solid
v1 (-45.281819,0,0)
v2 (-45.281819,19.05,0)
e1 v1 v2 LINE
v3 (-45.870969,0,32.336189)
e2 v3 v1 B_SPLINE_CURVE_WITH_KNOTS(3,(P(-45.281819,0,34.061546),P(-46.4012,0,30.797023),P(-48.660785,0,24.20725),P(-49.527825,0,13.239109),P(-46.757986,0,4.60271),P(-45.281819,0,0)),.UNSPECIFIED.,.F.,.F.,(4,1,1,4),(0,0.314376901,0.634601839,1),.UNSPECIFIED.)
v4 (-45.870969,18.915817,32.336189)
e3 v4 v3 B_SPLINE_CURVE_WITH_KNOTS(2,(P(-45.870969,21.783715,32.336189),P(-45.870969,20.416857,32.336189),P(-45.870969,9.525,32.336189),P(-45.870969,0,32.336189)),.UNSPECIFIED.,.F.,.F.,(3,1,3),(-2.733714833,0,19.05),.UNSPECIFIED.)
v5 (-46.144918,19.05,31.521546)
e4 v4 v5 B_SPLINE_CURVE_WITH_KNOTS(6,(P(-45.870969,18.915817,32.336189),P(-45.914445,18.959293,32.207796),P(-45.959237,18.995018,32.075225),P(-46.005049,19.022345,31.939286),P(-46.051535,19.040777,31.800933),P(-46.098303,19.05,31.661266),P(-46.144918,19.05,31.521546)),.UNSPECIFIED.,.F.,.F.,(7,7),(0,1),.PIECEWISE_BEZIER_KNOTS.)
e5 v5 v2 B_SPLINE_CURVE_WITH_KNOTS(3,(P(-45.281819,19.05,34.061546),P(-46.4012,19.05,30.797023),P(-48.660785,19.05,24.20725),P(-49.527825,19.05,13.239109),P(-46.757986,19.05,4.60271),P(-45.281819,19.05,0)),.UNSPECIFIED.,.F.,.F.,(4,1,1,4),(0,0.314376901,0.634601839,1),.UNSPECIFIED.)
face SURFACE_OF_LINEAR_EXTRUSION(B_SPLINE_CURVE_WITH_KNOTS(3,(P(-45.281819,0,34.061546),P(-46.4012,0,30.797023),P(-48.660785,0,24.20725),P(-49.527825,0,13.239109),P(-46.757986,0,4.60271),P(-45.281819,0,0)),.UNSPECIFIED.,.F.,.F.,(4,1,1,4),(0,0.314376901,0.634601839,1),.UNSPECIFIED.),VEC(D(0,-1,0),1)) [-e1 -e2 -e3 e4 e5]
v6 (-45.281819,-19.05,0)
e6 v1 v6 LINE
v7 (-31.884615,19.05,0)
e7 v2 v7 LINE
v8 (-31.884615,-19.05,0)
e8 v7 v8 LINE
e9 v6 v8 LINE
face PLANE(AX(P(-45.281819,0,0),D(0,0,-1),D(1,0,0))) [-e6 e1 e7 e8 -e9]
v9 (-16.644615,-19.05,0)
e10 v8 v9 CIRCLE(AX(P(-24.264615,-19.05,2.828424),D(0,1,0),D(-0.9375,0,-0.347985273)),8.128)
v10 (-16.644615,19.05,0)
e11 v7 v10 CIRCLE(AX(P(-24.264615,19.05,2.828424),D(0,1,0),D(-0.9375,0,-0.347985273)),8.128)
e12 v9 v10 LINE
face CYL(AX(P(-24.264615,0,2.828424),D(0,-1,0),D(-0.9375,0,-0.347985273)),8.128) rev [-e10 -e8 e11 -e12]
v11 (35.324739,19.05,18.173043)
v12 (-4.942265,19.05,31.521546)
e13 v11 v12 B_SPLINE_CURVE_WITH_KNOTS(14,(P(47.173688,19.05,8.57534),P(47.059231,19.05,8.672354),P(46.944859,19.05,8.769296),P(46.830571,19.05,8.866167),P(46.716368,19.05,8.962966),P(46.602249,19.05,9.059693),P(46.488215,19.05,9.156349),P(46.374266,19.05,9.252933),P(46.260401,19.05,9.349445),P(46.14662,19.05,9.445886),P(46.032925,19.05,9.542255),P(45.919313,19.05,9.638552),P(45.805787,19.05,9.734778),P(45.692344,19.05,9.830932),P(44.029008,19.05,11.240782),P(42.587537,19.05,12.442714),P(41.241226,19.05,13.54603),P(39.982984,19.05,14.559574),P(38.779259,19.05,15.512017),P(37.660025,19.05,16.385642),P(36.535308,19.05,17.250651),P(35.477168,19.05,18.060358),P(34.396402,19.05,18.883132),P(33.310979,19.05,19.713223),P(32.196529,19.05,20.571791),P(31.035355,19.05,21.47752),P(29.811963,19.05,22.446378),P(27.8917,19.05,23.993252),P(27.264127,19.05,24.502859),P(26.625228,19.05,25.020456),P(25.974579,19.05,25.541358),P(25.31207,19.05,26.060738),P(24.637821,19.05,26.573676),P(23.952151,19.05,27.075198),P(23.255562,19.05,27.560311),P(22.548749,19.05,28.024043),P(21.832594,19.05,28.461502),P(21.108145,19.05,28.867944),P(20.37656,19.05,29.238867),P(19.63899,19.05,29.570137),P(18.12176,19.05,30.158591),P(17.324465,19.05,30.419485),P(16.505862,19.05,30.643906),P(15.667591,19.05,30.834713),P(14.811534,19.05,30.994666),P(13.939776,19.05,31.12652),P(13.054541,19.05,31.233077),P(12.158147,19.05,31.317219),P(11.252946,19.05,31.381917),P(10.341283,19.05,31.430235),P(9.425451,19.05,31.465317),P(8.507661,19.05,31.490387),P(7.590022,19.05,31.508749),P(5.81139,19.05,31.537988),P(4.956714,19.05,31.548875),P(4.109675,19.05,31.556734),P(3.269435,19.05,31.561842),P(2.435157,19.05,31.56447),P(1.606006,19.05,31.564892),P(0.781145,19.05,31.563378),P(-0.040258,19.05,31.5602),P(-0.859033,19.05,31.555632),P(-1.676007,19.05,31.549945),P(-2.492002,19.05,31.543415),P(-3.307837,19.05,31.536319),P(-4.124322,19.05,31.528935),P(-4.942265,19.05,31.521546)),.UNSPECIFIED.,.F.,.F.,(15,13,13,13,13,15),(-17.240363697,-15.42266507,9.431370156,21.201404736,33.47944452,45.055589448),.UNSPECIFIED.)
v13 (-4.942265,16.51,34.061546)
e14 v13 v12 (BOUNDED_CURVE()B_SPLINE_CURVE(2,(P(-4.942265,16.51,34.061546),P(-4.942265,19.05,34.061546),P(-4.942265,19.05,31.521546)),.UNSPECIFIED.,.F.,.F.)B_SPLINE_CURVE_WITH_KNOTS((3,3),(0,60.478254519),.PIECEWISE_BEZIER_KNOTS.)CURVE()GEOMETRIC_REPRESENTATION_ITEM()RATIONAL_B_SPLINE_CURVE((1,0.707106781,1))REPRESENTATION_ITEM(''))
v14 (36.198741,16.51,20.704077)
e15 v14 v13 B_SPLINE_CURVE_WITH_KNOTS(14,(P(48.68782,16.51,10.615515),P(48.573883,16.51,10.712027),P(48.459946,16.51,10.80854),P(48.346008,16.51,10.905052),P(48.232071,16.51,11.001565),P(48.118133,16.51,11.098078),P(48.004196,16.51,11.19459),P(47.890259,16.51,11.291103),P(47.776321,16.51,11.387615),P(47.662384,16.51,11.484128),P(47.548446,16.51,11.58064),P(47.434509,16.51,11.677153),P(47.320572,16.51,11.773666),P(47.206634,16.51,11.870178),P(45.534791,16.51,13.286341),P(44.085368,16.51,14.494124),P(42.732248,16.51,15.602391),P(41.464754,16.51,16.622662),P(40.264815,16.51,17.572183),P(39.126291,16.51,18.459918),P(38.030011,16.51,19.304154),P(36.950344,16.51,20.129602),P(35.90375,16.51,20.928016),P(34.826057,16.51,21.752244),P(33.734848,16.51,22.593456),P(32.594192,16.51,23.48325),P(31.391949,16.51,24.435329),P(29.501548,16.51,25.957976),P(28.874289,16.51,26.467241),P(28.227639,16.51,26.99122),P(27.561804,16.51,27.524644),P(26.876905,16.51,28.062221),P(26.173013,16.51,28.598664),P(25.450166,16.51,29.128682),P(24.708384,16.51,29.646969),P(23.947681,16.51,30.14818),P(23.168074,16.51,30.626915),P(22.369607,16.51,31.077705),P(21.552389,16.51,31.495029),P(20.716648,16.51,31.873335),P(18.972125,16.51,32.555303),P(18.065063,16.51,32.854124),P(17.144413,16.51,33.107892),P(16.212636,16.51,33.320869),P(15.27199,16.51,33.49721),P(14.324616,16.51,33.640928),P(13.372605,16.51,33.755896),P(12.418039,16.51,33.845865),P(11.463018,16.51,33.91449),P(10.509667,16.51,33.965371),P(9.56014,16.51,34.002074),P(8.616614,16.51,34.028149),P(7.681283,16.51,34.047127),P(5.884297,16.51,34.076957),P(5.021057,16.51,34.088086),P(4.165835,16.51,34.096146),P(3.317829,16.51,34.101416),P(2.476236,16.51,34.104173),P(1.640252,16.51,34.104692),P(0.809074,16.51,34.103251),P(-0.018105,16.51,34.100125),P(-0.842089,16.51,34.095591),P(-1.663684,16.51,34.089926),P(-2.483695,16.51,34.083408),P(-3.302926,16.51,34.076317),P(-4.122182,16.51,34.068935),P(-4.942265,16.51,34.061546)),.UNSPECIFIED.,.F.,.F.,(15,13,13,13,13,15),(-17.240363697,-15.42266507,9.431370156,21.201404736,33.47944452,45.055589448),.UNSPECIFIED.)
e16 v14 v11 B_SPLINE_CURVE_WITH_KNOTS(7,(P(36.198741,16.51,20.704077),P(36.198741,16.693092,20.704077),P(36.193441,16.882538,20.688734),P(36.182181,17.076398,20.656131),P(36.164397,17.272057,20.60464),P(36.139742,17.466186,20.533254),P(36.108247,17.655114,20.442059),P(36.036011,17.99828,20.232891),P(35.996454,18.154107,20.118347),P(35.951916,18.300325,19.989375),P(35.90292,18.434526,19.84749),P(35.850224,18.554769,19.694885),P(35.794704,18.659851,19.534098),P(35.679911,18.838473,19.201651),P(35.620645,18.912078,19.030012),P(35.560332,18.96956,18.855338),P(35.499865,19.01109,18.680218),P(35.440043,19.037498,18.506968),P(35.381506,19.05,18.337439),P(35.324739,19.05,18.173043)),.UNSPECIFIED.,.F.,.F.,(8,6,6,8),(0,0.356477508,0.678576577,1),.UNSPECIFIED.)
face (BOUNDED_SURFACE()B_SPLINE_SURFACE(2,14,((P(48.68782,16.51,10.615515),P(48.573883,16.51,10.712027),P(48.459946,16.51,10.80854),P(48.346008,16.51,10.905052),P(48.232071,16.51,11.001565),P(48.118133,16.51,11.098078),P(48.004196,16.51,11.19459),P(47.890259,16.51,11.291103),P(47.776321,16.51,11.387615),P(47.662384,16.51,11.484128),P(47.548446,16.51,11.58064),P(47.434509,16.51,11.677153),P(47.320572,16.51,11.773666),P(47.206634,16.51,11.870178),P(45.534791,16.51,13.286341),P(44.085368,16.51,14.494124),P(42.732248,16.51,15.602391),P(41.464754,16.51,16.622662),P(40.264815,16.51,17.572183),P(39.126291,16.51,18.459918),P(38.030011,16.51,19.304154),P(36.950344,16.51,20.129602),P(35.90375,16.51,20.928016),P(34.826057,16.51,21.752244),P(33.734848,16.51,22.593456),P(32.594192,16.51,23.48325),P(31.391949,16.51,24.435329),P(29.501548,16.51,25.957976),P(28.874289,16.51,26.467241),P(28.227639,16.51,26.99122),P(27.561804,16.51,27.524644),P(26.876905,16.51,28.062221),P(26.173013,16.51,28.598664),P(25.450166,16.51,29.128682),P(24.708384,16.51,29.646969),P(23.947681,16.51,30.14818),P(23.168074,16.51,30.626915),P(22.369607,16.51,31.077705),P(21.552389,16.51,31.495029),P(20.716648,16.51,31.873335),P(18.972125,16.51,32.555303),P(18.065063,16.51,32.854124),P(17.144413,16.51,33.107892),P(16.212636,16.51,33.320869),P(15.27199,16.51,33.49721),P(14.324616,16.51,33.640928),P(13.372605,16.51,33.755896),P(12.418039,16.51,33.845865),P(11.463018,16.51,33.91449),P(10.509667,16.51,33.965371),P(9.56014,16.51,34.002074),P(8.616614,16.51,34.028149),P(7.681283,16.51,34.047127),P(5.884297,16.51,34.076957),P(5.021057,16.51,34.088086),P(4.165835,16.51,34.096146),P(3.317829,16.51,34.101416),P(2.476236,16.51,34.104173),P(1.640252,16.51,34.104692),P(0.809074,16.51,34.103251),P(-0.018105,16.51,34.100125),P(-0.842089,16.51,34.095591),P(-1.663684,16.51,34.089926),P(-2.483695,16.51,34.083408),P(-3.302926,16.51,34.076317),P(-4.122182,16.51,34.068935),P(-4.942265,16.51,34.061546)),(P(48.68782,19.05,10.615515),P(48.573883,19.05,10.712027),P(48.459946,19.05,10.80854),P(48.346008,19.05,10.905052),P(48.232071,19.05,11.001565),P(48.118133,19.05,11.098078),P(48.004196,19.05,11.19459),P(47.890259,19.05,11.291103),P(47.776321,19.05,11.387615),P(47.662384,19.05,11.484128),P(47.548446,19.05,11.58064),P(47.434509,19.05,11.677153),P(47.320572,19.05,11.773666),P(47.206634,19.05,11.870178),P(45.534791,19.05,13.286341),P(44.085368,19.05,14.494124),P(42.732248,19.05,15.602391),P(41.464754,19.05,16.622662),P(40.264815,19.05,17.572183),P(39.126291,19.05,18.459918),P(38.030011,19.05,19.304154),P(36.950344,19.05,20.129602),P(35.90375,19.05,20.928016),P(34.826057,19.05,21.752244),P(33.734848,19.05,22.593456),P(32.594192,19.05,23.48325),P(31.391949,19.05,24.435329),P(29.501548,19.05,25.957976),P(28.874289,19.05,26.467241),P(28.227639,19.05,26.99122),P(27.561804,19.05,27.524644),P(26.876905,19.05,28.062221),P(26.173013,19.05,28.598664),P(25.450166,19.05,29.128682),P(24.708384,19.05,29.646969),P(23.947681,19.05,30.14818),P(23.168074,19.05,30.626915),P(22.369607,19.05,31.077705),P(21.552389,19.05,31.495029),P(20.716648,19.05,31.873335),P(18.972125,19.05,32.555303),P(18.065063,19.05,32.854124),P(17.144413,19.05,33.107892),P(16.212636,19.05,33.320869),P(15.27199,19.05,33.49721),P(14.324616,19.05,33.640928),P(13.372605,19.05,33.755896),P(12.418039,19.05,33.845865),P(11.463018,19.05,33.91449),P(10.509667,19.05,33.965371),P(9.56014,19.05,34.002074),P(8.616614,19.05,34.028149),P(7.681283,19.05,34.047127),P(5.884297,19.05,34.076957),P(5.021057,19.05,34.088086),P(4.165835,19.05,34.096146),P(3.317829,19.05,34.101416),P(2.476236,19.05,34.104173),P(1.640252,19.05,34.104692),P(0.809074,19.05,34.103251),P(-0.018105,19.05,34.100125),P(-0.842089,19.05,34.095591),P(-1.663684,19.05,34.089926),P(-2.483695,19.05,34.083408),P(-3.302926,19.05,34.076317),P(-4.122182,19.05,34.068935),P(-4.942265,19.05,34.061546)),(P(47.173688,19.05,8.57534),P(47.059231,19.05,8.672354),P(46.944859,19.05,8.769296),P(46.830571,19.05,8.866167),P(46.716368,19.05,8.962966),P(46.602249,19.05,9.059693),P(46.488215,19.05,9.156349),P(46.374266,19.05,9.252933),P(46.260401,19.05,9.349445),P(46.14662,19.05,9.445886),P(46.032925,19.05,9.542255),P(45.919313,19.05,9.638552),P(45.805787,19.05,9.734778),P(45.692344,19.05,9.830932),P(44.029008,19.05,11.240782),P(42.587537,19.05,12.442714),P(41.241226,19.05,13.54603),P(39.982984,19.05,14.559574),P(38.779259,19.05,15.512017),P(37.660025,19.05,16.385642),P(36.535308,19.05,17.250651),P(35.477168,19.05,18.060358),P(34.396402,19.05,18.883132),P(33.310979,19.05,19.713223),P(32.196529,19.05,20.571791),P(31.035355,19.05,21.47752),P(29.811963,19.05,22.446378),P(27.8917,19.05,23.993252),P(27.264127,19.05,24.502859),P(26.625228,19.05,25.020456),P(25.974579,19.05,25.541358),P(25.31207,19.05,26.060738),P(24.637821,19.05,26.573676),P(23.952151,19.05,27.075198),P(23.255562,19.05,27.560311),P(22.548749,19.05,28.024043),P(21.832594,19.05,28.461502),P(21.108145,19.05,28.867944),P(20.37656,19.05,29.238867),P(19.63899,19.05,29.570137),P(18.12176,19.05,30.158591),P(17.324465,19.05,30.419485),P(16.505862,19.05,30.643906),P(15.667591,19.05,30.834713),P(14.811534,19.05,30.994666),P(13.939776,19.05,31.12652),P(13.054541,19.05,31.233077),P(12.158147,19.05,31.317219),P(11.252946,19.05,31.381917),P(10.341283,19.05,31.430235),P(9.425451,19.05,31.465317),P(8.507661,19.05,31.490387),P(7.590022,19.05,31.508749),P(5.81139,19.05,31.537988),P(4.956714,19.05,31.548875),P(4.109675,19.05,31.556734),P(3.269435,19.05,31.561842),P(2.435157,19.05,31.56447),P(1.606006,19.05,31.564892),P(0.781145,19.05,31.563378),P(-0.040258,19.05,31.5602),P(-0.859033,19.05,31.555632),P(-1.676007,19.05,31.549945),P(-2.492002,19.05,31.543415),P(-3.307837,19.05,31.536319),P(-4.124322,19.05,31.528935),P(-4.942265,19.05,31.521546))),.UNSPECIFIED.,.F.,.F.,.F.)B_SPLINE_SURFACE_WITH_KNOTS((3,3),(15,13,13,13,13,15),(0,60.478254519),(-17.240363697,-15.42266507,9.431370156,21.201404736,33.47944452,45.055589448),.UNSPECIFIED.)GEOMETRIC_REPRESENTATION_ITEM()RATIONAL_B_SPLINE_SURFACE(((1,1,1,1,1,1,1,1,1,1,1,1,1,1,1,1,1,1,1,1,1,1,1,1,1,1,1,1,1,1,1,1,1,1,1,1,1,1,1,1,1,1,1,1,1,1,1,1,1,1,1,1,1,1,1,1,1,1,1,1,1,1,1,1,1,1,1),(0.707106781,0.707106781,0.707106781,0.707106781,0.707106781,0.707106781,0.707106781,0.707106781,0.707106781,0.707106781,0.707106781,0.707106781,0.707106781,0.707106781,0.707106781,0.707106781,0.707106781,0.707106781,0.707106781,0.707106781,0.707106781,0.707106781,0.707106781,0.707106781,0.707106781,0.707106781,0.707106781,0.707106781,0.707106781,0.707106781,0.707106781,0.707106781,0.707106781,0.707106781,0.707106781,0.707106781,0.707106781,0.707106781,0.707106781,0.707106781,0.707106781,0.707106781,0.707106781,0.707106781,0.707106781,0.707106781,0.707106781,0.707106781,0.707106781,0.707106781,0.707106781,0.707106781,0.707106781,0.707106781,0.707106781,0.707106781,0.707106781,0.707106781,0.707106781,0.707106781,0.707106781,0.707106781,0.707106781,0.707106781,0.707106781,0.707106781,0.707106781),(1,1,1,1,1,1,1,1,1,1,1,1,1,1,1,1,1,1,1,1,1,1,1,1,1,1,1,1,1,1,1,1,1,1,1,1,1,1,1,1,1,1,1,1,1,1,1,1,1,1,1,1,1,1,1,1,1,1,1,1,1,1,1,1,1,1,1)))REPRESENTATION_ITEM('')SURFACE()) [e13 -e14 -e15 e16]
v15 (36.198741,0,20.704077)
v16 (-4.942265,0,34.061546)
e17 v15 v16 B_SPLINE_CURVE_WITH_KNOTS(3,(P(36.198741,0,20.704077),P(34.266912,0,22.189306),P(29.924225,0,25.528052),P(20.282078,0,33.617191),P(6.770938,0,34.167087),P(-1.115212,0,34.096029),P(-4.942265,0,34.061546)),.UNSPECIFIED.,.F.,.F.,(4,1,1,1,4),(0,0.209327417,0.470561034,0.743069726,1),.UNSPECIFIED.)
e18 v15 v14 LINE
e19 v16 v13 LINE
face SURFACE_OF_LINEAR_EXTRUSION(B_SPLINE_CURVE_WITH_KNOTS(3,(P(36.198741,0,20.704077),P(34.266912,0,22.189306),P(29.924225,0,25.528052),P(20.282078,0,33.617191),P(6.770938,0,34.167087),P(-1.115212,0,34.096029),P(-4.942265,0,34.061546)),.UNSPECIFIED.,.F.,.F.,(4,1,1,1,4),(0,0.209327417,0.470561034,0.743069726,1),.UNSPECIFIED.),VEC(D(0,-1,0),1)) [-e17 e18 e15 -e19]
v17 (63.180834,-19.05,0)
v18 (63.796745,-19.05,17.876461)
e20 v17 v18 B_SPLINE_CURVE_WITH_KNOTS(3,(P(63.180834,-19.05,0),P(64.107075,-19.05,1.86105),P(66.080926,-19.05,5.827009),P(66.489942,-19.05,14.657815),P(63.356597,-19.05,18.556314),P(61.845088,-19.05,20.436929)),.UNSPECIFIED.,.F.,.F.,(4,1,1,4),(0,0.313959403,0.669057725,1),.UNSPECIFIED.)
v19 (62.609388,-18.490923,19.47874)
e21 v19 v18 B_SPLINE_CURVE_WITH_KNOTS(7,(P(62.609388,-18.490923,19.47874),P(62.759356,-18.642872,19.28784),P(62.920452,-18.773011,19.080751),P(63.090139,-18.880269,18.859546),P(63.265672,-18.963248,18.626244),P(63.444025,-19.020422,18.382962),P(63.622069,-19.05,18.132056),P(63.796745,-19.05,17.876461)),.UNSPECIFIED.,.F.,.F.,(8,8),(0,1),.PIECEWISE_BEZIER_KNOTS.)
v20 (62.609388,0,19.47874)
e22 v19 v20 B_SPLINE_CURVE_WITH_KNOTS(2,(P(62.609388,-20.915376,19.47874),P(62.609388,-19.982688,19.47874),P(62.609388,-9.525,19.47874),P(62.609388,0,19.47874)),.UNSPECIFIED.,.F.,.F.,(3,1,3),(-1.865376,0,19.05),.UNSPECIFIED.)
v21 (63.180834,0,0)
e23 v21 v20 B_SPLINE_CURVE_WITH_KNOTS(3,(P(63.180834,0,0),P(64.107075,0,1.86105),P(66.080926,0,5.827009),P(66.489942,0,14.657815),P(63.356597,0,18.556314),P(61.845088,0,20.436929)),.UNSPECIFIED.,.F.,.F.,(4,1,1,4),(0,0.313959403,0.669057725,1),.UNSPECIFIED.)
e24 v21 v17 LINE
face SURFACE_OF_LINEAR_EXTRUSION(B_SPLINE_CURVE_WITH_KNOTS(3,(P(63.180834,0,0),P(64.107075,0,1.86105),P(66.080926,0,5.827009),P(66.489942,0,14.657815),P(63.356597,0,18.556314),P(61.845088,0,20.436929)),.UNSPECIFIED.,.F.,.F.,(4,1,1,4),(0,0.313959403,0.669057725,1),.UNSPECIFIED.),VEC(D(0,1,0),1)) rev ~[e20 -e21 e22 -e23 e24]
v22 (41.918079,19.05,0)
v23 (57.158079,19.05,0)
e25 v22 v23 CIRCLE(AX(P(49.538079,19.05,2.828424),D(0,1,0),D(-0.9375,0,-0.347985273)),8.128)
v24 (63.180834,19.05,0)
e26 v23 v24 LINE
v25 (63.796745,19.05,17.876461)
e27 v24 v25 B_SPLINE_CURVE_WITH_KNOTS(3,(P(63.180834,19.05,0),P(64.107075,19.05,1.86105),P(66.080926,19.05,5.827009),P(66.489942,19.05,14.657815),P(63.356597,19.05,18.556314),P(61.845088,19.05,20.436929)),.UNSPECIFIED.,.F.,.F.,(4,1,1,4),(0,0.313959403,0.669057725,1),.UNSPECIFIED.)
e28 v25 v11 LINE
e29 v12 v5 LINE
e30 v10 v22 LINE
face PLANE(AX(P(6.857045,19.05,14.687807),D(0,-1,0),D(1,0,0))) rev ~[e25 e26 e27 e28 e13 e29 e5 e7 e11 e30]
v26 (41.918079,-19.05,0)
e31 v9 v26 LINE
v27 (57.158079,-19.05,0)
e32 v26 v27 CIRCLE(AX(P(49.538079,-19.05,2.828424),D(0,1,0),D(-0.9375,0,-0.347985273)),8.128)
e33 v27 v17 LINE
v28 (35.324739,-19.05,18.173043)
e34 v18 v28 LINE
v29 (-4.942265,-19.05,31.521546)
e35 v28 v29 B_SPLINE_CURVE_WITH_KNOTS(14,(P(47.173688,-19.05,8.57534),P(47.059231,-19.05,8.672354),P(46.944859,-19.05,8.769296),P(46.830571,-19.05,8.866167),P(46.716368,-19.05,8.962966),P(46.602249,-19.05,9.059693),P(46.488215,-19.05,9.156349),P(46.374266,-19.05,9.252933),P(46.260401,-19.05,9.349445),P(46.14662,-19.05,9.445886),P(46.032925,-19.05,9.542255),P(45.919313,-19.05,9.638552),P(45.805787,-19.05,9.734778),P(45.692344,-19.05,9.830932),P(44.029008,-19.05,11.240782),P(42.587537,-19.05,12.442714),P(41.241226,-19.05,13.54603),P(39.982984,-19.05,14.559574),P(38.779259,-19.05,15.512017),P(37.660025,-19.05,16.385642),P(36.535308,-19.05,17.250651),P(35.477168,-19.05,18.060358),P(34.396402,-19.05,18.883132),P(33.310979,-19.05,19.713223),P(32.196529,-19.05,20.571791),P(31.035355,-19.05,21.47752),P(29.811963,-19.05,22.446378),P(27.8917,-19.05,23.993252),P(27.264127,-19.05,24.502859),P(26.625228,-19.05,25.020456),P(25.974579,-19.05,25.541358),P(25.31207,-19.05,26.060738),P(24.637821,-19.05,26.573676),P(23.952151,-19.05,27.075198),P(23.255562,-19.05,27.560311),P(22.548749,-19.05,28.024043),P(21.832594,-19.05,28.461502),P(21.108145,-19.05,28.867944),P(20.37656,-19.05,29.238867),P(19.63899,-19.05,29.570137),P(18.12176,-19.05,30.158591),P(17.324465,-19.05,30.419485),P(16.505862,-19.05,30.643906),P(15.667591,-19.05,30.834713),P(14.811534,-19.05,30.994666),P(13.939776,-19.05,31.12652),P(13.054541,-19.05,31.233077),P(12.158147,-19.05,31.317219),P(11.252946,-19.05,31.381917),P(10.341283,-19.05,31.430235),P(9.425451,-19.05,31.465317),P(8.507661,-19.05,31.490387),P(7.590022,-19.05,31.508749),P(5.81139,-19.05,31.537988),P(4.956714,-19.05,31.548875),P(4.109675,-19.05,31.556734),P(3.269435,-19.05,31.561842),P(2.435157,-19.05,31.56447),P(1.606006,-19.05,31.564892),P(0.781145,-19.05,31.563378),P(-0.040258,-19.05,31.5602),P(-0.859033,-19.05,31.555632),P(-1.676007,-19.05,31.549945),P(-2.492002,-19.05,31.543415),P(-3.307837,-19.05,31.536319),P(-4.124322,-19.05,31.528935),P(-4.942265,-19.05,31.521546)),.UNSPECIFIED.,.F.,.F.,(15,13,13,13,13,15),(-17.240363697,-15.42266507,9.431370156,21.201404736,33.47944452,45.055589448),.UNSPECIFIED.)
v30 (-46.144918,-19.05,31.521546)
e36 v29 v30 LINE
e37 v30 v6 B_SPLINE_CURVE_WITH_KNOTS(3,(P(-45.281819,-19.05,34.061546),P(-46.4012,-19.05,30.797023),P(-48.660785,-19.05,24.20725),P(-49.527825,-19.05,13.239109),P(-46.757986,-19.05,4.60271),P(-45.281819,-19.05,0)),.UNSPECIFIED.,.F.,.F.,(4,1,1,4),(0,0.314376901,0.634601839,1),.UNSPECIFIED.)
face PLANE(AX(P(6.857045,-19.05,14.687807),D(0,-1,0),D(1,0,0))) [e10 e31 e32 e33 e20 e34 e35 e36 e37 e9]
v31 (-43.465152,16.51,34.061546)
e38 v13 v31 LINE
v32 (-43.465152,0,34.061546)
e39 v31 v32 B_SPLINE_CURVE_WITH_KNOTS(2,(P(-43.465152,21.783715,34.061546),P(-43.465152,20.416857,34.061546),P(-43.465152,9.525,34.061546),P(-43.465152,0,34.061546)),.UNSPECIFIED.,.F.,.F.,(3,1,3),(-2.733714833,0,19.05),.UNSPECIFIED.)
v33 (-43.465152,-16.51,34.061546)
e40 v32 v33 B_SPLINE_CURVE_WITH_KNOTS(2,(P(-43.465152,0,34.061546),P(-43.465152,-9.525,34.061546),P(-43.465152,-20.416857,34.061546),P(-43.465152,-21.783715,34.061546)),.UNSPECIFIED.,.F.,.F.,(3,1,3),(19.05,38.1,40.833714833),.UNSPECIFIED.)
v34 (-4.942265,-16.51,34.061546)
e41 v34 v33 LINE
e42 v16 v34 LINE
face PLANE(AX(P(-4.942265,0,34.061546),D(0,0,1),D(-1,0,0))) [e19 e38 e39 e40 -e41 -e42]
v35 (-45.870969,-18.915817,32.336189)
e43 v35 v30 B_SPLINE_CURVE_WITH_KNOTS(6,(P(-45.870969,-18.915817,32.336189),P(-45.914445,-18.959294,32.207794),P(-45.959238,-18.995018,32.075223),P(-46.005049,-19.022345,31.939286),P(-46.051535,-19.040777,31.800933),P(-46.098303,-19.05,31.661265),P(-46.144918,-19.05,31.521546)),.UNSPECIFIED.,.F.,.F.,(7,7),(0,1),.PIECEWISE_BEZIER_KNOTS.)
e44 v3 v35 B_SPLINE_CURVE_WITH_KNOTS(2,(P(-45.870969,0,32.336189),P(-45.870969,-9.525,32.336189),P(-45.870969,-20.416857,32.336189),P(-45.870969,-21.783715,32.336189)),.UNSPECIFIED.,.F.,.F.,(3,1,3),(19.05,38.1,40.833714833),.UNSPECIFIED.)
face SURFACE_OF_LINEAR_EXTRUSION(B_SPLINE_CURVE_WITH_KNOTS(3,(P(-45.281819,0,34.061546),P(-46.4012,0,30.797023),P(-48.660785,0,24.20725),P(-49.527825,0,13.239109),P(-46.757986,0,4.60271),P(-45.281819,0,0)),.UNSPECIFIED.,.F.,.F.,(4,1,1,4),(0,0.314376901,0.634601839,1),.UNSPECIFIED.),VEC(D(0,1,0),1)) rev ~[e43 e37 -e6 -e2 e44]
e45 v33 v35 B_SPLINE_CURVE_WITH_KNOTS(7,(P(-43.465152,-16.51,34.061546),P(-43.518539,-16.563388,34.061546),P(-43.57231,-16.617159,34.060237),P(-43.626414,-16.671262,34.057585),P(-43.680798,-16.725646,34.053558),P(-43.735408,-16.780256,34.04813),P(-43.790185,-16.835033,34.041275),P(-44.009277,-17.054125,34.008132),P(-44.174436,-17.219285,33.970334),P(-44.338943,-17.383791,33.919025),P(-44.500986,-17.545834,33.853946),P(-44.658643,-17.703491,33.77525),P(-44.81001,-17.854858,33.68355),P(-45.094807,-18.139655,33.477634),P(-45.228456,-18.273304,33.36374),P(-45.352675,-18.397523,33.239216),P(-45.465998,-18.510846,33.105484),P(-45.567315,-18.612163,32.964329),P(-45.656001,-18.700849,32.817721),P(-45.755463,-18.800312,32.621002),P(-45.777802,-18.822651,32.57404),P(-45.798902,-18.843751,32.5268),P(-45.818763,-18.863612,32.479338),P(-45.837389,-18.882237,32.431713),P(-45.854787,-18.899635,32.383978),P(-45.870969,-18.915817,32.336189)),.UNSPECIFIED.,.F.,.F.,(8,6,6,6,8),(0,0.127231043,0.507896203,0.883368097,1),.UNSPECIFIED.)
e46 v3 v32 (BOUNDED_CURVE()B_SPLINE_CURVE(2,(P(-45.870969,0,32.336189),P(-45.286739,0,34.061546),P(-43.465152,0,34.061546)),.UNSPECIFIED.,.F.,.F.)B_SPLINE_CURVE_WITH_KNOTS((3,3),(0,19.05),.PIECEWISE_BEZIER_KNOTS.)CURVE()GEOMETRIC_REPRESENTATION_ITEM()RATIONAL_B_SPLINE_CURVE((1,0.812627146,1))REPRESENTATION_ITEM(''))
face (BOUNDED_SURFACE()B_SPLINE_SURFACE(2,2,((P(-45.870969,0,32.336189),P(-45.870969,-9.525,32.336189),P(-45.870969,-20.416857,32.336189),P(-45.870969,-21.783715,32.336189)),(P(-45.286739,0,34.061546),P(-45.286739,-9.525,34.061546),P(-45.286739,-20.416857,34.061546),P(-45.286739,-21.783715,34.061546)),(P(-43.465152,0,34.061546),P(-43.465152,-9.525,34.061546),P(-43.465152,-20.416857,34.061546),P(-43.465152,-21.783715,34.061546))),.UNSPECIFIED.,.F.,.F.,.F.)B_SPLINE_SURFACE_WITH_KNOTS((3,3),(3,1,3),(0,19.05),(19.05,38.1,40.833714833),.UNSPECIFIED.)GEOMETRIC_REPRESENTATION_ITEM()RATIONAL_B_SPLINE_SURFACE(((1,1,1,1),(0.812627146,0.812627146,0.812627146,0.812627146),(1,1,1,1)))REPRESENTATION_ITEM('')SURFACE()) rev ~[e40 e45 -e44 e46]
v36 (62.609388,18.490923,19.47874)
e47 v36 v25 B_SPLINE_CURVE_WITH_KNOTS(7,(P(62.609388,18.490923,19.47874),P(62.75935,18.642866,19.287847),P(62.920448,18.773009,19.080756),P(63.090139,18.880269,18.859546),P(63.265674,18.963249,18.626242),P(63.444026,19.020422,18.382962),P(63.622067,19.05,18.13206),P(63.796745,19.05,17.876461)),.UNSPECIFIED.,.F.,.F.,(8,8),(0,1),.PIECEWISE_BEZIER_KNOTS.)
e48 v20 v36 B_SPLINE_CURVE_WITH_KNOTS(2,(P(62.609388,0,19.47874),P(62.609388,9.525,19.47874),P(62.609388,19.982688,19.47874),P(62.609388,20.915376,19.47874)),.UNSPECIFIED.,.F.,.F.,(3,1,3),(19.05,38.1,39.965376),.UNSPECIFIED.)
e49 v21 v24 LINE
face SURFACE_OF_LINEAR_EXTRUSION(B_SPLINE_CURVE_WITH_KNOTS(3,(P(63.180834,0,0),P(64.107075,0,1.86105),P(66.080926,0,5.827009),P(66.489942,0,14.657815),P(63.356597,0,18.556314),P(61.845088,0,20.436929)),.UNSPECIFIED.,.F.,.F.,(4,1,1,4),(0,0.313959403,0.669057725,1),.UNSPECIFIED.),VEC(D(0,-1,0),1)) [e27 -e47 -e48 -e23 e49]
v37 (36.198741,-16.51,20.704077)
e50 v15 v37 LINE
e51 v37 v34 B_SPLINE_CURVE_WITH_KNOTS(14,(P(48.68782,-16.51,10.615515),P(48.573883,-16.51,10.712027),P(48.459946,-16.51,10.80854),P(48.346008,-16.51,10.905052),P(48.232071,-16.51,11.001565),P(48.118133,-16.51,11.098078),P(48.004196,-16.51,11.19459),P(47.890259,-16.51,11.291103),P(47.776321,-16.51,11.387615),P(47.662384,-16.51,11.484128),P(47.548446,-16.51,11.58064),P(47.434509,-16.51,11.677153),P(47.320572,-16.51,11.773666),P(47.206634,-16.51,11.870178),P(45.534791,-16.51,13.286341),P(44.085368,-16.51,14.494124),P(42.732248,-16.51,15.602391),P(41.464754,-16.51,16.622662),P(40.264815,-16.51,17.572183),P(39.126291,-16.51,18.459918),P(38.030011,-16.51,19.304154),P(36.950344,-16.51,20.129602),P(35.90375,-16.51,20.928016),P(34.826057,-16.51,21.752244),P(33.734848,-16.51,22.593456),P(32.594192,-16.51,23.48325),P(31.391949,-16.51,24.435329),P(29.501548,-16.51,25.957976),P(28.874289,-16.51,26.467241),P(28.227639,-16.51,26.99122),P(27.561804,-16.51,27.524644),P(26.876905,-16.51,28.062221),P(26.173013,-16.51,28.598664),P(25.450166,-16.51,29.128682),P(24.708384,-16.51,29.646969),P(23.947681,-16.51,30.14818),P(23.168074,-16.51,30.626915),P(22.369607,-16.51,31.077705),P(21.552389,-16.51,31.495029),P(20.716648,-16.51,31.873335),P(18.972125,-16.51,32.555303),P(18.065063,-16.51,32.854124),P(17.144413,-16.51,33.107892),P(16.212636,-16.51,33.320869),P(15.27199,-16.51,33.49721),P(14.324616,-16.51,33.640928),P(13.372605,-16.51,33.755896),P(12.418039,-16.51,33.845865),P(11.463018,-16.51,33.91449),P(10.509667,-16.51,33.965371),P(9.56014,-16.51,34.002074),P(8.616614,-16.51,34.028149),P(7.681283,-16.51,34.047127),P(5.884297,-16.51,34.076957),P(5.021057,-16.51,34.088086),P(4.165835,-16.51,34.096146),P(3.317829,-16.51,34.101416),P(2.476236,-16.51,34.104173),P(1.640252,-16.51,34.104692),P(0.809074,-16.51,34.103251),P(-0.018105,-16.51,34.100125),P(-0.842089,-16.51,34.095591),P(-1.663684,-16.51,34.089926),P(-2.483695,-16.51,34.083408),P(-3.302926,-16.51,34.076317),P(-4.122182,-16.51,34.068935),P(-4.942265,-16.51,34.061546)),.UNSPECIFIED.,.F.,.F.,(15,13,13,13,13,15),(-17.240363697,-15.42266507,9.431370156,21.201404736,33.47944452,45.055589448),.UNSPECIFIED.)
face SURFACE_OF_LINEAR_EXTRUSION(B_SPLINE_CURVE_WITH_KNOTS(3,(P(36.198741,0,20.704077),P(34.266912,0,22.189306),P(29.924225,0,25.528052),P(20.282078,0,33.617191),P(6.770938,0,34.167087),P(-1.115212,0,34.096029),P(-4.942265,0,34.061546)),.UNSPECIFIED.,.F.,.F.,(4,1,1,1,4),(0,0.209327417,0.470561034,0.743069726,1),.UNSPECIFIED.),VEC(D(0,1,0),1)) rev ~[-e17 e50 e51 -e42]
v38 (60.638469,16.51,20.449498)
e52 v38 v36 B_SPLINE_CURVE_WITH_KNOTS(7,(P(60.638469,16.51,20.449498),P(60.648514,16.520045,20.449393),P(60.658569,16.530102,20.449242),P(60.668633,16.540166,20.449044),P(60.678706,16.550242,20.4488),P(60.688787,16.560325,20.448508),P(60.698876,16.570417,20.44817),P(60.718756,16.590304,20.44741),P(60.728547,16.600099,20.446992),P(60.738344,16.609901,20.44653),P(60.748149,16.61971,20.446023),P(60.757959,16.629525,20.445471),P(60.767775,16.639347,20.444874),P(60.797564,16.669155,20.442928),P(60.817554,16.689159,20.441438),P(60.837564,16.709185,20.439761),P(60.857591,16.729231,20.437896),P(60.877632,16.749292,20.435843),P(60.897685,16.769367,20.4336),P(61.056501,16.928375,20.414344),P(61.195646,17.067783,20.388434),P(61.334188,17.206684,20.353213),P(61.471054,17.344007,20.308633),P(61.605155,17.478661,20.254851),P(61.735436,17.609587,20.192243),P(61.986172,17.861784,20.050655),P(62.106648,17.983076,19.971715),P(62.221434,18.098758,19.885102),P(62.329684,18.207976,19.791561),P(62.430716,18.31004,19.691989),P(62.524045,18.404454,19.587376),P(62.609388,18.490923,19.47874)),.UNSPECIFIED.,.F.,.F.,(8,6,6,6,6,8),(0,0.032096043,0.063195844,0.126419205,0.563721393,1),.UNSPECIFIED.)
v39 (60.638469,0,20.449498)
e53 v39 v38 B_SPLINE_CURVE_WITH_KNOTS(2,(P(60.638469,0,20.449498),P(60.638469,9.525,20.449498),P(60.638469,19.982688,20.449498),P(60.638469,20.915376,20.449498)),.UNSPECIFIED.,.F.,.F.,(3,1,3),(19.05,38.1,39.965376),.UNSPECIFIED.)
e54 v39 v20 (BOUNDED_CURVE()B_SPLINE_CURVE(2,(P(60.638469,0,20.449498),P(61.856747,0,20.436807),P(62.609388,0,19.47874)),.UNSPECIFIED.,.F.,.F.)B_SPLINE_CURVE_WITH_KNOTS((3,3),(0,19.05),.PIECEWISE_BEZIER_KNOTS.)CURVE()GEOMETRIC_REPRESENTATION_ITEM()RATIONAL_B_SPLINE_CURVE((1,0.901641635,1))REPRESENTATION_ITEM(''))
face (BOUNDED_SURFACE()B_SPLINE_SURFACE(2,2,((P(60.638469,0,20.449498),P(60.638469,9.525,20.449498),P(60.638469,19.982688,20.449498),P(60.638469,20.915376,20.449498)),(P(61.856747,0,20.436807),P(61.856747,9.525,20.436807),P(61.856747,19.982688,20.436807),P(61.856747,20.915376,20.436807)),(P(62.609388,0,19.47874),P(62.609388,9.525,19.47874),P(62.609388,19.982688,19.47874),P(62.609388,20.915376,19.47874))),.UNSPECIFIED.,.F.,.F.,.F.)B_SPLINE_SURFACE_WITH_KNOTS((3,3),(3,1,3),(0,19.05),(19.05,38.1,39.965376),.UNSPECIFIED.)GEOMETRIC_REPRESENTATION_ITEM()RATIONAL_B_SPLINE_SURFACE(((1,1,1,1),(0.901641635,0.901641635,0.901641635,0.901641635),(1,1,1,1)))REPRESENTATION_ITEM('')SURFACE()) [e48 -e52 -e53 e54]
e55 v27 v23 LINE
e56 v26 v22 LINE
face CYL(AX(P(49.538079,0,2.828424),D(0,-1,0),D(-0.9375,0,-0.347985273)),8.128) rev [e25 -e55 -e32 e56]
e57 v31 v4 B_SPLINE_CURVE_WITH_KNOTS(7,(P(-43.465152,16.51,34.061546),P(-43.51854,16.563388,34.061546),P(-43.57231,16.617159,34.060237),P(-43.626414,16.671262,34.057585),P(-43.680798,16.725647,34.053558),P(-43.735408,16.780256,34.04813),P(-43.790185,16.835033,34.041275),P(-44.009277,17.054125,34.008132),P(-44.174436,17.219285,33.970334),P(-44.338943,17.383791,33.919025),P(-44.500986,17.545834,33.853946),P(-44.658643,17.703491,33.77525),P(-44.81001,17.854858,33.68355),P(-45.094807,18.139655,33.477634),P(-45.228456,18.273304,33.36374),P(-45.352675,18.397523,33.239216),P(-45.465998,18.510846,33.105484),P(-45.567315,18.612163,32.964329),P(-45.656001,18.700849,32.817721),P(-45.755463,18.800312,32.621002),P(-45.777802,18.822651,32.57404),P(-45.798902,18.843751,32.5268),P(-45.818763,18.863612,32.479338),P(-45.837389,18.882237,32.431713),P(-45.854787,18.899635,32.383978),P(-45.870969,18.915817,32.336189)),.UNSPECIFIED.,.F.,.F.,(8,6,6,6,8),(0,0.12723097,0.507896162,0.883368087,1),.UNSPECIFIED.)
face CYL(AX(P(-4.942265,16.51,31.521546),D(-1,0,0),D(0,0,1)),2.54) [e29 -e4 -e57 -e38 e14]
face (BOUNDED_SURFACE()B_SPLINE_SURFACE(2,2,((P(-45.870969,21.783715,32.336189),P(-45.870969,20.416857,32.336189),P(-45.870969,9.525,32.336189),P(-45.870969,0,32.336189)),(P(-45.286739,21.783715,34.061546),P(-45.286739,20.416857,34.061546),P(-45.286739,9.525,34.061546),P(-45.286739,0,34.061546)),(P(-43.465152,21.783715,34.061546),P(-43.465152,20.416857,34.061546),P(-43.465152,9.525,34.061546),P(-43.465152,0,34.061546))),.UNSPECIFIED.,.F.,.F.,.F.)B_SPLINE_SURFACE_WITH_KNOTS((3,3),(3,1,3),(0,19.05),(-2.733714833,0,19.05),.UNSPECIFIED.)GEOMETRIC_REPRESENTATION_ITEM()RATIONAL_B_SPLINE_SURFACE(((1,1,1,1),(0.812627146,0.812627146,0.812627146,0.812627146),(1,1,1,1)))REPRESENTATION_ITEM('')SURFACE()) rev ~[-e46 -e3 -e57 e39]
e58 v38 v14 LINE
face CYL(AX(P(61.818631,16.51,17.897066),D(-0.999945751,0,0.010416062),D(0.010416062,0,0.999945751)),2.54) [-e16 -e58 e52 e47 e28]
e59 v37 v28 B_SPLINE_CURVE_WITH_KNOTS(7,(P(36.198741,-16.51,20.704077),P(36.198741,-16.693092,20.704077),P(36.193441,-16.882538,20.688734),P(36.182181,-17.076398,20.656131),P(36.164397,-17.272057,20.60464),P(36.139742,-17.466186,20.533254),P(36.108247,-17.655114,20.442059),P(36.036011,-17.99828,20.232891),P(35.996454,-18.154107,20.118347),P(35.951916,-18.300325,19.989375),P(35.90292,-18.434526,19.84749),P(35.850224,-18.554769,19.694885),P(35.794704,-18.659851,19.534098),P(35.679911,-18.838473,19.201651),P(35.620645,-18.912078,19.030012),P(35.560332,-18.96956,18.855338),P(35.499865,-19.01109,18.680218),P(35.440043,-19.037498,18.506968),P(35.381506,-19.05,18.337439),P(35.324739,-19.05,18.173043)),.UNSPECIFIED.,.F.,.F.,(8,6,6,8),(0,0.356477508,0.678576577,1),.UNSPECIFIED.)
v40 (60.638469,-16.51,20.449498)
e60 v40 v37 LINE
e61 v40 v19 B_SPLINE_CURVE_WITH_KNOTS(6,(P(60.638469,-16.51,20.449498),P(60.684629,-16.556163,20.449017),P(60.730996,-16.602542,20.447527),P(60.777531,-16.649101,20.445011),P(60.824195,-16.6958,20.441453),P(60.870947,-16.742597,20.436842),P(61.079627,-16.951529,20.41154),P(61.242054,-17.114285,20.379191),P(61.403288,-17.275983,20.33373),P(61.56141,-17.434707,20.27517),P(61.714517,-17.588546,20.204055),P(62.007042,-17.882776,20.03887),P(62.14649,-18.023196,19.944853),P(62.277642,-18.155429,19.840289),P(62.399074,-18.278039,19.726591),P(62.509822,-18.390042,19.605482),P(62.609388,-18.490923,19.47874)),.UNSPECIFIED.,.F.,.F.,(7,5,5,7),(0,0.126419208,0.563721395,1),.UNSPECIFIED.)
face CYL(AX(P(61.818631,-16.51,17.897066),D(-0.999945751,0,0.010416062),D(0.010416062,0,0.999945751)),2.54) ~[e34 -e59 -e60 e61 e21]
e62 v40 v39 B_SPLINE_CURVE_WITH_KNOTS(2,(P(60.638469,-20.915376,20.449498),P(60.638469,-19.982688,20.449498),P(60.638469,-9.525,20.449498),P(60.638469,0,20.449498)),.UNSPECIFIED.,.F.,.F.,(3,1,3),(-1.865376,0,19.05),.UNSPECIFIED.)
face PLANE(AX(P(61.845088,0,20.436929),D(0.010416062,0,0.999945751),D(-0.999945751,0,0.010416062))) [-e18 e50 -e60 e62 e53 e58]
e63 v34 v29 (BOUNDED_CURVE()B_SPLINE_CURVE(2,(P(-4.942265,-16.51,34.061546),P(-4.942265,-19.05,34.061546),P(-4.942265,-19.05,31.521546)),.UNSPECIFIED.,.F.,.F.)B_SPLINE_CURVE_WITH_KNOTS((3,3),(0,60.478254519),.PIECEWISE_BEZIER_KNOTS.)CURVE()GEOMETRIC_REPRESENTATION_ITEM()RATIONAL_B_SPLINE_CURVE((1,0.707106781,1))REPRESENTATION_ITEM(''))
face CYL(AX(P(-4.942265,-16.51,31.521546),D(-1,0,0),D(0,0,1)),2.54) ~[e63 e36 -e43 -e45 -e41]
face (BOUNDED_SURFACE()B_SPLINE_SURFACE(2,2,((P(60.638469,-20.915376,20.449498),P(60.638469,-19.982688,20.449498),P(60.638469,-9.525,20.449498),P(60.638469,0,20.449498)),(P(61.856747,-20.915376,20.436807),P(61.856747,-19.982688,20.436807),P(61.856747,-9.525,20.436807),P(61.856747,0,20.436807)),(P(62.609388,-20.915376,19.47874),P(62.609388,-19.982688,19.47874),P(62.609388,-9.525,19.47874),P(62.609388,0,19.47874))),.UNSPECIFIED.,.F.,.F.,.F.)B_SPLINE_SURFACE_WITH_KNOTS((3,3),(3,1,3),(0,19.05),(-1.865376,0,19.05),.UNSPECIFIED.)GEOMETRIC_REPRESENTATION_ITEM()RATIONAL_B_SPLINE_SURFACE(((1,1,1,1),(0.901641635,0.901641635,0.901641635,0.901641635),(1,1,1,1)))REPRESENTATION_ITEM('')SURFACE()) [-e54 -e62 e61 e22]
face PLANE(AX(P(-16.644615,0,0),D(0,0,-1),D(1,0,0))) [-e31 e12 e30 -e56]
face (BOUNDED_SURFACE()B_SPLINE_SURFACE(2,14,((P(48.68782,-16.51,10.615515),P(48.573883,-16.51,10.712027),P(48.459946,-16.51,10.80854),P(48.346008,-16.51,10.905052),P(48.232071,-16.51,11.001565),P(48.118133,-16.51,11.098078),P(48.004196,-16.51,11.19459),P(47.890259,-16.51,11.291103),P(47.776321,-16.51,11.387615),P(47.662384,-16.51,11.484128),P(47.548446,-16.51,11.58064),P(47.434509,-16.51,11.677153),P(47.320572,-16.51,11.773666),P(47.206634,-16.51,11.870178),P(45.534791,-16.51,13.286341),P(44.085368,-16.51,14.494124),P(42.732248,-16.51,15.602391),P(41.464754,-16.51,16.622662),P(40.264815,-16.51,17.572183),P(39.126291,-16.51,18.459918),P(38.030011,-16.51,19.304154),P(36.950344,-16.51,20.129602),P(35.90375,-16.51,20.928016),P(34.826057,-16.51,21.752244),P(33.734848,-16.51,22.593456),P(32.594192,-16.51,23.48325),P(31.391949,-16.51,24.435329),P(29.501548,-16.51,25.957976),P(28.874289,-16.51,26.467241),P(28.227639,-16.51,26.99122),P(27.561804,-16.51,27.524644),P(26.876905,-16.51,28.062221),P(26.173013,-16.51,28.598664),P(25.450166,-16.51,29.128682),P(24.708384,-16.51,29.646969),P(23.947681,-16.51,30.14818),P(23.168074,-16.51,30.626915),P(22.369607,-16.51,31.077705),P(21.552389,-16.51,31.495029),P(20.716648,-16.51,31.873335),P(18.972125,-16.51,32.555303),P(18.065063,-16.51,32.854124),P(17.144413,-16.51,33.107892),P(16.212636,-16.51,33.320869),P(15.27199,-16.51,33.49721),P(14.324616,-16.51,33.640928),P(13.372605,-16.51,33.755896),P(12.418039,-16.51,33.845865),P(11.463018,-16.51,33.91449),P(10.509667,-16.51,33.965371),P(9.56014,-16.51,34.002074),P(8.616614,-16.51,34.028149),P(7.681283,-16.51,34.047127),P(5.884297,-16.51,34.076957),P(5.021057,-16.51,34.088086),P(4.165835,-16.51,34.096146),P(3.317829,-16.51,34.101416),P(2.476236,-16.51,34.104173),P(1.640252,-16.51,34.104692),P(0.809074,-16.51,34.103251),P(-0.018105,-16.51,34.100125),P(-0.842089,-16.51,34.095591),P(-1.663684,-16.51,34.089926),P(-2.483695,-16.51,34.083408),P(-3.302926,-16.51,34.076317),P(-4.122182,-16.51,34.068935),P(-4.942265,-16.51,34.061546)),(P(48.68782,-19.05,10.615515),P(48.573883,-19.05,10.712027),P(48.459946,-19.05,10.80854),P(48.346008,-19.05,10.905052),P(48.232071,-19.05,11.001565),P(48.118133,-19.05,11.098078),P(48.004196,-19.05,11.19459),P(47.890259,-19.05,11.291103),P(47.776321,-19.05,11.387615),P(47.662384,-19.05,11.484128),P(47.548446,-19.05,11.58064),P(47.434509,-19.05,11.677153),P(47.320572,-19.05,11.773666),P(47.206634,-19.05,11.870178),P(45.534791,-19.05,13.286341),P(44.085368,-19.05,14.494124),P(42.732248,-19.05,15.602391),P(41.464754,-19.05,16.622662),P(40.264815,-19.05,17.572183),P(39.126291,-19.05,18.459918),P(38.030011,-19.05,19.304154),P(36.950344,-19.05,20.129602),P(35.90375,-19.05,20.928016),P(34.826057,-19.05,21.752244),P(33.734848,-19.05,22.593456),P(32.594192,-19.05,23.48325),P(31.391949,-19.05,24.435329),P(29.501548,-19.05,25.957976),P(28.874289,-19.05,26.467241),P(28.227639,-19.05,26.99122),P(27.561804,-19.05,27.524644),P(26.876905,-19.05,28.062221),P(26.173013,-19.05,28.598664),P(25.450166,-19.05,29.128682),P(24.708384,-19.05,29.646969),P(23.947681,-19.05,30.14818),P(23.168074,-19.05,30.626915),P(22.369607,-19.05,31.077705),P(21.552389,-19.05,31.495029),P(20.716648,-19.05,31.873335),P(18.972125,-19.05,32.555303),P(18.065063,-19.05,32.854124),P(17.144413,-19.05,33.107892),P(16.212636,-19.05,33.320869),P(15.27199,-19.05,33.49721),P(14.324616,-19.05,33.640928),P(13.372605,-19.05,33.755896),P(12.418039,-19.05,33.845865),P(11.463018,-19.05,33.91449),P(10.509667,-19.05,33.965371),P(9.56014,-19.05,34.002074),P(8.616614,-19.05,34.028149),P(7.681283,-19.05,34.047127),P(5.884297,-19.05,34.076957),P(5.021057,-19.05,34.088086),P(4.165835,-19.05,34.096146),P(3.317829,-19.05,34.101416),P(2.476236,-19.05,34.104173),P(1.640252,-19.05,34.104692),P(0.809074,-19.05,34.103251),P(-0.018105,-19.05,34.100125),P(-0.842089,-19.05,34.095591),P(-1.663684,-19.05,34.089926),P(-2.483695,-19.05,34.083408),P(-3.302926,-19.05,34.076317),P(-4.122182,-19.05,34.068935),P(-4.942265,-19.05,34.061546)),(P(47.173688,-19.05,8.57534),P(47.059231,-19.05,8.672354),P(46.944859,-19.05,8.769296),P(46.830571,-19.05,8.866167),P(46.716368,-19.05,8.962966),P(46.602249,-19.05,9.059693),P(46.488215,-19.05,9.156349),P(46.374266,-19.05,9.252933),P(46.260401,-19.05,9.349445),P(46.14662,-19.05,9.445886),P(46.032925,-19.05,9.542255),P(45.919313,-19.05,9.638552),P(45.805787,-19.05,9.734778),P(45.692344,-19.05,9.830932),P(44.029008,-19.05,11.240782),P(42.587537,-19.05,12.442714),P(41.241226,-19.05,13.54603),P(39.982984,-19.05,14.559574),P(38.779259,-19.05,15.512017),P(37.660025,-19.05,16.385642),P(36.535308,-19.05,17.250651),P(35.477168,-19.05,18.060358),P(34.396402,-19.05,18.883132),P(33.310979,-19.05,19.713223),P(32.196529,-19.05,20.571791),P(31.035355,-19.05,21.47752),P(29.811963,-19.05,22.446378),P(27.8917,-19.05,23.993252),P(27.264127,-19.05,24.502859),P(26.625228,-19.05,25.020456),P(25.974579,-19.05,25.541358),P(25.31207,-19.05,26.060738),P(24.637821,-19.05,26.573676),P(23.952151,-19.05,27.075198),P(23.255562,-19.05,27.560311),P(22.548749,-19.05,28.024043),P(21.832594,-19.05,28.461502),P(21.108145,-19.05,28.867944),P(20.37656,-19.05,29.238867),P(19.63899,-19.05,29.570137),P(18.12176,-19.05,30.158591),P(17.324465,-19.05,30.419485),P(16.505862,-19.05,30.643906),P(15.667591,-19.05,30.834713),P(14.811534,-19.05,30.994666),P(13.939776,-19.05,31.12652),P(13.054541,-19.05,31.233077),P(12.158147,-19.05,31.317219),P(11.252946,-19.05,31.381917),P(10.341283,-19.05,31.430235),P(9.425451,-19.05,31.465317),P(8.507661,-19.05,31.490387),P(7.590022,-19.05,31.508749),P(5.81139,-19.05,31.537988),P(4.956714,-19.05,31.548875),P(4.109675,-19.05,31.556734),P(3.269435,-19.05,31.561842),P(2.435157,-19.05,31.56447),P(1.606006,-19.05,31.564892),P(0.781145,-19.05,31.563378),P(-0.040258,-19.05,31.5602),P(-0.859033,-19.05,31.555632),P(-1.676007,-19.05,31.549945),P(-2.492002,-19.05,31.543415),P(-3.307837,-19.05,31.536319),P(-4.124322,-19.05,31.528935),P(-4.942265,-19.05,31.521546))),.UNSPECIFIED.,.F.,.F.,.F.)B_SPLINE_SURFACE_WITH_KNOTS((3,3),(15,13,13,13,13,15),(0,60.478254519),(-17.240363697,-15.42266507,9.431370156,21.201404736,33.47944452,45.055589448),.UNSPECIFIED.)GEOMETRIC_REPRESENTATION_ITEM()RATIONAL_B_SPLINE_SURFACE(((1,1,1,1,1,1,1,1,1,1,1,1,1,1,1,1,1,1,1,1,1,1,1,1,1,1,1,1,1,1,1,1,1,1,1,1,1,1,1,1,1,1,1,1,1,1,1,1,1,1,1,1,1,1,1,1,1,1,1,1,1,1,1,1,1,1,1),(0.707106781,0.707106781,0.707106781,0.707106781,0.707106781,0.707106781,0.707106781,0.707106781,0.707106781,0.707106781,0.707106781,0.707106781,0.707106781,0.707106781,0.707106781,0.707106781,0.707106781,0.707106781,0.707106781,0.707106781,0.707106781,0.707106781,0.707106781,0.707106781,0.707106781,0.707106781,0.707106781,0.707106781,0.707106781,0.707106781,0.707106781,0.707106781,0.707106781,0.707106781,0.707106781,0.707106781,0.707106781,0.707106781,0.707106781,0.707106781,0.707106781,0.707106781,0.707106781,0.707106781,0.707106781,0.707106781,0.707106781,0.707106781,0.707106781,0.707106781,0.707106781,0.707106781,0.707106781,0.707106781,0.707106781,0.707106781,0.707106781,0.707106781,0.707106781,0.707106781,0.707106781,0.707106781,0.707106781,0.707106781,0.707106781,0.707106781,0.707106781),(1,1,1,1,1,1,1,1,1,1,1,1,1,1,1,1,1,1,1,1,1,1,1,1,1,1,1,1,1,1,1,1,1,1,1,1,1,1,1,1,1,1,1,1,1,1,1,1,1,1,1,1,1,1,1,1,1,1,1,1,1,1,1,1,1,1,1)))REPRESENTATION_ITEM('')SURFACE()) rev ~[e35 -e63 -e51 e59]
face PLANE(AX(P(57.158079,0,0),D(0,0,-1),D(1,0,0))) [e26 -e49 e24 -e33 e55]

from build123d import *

# Parameters (mm, degrees)
F1_DEPTH = 19.05
F2_R     = 2.54


# Not quite as in the source:
# - a feature of the source that left no trace in its solid (it failed there, or was rolled back) is left out
# - the program builds the solid bodies; features that only make, move or delete a surface that nothing else refers to are left out


with BuildPart() as f1:
    # F0 (on Front) → F1 (new body, symmetric)
    with BuildSketch(Plane.XZ):
        with BuildLine():
            Line((57.1580786184, 0), (63.1808337388, 0))
            add(Edge.make_bspline(
                [(63.1808337388, 0), (64.1070753603, 1.8610503512), (66.0809264552, 5.8270093279), (66.4899415159, 14.6578153912), (63.3565966702, 18.5563140043), (61.8450880558, 20.4369286596)],
                knots=[0, 0, 0, 0, 0.3139594033, 0.669057725, 1, 1, 1, 1], degree=3))
            Line((61.8450880558, 20.4369286596), (36.198740513, 20.7040771047))
            add(Edge.make_bspline(
                [(36.198740513, 20.7040771047), (34.2669116908, 22.189306267), (29.9242250959, 25.5280517601), (20.2820782894, 33.6171914647), (6.7709379775, 34.1670870206), (-1.1152122764, 34.0960294227), (-4.942264819, 34.0615460371)],
                knots=[0, 0, 0, 0, 0.2093274169, 0.4705610335, 0.7430697263, 1, 1, 1, 1], degree=3))
            Line((-4.942264819, 34.0615460371), (-45.2818187647, 34.0615460371))
            add(Edge.make_bspline(
                [(-45.2818187647, 34.0615460371), (-46.4011998646, 30.7970228492), (-48.6607847814, 24.2072498428), (-49.5278252711, 13.2391089732), (-46.7579858308, 4.6027100105), (-45.2818187647, 0)],
                knots=[0, 0, 0, 0, 0.3143769013, 0.6346018389, 1, 1, 1, 1], degree=3))
            Line((-45.2818187647, 0), (-31.8846153722, 0))
            ThreePointArc((-31.8846153722, 0), (-24.2646153722, 10.9564242963), (-16.6446153722, 0))
            Line((-16.6446153722, 0), (41.9180786184, 0))
            ThreePointArc((41.9180786184, 0), (49.5380786184, 10.9564242963), (57.1580786184, 0))
        make_face()
    extrude(amount=F1_DEPTH, both=True)

    # F2
    f2_edges = [f1.edges().sort_by_distance(p)[0] for p in [
        (49.021914, -19.05, 20.570503),
        (49.021914, 19.05, 20.570503),
        (61.845088, 9.525, 20.436929),
        (61.845088, -9.525, 20.436929),
        (17.503149, -19.05, 32.967083),
        (17.503149, 19.05, 32.967083),
        (-45.281819, -9.525, 34.061546),
        (-45.281819, 9.525, 34.061546),
        (-25.112042, 19.05, 34.061546),
        (-25.112042, -19.05, 34.061546),
    ]]
    fillet(f2_edges, radius=F2_R)


solid = f1.part
